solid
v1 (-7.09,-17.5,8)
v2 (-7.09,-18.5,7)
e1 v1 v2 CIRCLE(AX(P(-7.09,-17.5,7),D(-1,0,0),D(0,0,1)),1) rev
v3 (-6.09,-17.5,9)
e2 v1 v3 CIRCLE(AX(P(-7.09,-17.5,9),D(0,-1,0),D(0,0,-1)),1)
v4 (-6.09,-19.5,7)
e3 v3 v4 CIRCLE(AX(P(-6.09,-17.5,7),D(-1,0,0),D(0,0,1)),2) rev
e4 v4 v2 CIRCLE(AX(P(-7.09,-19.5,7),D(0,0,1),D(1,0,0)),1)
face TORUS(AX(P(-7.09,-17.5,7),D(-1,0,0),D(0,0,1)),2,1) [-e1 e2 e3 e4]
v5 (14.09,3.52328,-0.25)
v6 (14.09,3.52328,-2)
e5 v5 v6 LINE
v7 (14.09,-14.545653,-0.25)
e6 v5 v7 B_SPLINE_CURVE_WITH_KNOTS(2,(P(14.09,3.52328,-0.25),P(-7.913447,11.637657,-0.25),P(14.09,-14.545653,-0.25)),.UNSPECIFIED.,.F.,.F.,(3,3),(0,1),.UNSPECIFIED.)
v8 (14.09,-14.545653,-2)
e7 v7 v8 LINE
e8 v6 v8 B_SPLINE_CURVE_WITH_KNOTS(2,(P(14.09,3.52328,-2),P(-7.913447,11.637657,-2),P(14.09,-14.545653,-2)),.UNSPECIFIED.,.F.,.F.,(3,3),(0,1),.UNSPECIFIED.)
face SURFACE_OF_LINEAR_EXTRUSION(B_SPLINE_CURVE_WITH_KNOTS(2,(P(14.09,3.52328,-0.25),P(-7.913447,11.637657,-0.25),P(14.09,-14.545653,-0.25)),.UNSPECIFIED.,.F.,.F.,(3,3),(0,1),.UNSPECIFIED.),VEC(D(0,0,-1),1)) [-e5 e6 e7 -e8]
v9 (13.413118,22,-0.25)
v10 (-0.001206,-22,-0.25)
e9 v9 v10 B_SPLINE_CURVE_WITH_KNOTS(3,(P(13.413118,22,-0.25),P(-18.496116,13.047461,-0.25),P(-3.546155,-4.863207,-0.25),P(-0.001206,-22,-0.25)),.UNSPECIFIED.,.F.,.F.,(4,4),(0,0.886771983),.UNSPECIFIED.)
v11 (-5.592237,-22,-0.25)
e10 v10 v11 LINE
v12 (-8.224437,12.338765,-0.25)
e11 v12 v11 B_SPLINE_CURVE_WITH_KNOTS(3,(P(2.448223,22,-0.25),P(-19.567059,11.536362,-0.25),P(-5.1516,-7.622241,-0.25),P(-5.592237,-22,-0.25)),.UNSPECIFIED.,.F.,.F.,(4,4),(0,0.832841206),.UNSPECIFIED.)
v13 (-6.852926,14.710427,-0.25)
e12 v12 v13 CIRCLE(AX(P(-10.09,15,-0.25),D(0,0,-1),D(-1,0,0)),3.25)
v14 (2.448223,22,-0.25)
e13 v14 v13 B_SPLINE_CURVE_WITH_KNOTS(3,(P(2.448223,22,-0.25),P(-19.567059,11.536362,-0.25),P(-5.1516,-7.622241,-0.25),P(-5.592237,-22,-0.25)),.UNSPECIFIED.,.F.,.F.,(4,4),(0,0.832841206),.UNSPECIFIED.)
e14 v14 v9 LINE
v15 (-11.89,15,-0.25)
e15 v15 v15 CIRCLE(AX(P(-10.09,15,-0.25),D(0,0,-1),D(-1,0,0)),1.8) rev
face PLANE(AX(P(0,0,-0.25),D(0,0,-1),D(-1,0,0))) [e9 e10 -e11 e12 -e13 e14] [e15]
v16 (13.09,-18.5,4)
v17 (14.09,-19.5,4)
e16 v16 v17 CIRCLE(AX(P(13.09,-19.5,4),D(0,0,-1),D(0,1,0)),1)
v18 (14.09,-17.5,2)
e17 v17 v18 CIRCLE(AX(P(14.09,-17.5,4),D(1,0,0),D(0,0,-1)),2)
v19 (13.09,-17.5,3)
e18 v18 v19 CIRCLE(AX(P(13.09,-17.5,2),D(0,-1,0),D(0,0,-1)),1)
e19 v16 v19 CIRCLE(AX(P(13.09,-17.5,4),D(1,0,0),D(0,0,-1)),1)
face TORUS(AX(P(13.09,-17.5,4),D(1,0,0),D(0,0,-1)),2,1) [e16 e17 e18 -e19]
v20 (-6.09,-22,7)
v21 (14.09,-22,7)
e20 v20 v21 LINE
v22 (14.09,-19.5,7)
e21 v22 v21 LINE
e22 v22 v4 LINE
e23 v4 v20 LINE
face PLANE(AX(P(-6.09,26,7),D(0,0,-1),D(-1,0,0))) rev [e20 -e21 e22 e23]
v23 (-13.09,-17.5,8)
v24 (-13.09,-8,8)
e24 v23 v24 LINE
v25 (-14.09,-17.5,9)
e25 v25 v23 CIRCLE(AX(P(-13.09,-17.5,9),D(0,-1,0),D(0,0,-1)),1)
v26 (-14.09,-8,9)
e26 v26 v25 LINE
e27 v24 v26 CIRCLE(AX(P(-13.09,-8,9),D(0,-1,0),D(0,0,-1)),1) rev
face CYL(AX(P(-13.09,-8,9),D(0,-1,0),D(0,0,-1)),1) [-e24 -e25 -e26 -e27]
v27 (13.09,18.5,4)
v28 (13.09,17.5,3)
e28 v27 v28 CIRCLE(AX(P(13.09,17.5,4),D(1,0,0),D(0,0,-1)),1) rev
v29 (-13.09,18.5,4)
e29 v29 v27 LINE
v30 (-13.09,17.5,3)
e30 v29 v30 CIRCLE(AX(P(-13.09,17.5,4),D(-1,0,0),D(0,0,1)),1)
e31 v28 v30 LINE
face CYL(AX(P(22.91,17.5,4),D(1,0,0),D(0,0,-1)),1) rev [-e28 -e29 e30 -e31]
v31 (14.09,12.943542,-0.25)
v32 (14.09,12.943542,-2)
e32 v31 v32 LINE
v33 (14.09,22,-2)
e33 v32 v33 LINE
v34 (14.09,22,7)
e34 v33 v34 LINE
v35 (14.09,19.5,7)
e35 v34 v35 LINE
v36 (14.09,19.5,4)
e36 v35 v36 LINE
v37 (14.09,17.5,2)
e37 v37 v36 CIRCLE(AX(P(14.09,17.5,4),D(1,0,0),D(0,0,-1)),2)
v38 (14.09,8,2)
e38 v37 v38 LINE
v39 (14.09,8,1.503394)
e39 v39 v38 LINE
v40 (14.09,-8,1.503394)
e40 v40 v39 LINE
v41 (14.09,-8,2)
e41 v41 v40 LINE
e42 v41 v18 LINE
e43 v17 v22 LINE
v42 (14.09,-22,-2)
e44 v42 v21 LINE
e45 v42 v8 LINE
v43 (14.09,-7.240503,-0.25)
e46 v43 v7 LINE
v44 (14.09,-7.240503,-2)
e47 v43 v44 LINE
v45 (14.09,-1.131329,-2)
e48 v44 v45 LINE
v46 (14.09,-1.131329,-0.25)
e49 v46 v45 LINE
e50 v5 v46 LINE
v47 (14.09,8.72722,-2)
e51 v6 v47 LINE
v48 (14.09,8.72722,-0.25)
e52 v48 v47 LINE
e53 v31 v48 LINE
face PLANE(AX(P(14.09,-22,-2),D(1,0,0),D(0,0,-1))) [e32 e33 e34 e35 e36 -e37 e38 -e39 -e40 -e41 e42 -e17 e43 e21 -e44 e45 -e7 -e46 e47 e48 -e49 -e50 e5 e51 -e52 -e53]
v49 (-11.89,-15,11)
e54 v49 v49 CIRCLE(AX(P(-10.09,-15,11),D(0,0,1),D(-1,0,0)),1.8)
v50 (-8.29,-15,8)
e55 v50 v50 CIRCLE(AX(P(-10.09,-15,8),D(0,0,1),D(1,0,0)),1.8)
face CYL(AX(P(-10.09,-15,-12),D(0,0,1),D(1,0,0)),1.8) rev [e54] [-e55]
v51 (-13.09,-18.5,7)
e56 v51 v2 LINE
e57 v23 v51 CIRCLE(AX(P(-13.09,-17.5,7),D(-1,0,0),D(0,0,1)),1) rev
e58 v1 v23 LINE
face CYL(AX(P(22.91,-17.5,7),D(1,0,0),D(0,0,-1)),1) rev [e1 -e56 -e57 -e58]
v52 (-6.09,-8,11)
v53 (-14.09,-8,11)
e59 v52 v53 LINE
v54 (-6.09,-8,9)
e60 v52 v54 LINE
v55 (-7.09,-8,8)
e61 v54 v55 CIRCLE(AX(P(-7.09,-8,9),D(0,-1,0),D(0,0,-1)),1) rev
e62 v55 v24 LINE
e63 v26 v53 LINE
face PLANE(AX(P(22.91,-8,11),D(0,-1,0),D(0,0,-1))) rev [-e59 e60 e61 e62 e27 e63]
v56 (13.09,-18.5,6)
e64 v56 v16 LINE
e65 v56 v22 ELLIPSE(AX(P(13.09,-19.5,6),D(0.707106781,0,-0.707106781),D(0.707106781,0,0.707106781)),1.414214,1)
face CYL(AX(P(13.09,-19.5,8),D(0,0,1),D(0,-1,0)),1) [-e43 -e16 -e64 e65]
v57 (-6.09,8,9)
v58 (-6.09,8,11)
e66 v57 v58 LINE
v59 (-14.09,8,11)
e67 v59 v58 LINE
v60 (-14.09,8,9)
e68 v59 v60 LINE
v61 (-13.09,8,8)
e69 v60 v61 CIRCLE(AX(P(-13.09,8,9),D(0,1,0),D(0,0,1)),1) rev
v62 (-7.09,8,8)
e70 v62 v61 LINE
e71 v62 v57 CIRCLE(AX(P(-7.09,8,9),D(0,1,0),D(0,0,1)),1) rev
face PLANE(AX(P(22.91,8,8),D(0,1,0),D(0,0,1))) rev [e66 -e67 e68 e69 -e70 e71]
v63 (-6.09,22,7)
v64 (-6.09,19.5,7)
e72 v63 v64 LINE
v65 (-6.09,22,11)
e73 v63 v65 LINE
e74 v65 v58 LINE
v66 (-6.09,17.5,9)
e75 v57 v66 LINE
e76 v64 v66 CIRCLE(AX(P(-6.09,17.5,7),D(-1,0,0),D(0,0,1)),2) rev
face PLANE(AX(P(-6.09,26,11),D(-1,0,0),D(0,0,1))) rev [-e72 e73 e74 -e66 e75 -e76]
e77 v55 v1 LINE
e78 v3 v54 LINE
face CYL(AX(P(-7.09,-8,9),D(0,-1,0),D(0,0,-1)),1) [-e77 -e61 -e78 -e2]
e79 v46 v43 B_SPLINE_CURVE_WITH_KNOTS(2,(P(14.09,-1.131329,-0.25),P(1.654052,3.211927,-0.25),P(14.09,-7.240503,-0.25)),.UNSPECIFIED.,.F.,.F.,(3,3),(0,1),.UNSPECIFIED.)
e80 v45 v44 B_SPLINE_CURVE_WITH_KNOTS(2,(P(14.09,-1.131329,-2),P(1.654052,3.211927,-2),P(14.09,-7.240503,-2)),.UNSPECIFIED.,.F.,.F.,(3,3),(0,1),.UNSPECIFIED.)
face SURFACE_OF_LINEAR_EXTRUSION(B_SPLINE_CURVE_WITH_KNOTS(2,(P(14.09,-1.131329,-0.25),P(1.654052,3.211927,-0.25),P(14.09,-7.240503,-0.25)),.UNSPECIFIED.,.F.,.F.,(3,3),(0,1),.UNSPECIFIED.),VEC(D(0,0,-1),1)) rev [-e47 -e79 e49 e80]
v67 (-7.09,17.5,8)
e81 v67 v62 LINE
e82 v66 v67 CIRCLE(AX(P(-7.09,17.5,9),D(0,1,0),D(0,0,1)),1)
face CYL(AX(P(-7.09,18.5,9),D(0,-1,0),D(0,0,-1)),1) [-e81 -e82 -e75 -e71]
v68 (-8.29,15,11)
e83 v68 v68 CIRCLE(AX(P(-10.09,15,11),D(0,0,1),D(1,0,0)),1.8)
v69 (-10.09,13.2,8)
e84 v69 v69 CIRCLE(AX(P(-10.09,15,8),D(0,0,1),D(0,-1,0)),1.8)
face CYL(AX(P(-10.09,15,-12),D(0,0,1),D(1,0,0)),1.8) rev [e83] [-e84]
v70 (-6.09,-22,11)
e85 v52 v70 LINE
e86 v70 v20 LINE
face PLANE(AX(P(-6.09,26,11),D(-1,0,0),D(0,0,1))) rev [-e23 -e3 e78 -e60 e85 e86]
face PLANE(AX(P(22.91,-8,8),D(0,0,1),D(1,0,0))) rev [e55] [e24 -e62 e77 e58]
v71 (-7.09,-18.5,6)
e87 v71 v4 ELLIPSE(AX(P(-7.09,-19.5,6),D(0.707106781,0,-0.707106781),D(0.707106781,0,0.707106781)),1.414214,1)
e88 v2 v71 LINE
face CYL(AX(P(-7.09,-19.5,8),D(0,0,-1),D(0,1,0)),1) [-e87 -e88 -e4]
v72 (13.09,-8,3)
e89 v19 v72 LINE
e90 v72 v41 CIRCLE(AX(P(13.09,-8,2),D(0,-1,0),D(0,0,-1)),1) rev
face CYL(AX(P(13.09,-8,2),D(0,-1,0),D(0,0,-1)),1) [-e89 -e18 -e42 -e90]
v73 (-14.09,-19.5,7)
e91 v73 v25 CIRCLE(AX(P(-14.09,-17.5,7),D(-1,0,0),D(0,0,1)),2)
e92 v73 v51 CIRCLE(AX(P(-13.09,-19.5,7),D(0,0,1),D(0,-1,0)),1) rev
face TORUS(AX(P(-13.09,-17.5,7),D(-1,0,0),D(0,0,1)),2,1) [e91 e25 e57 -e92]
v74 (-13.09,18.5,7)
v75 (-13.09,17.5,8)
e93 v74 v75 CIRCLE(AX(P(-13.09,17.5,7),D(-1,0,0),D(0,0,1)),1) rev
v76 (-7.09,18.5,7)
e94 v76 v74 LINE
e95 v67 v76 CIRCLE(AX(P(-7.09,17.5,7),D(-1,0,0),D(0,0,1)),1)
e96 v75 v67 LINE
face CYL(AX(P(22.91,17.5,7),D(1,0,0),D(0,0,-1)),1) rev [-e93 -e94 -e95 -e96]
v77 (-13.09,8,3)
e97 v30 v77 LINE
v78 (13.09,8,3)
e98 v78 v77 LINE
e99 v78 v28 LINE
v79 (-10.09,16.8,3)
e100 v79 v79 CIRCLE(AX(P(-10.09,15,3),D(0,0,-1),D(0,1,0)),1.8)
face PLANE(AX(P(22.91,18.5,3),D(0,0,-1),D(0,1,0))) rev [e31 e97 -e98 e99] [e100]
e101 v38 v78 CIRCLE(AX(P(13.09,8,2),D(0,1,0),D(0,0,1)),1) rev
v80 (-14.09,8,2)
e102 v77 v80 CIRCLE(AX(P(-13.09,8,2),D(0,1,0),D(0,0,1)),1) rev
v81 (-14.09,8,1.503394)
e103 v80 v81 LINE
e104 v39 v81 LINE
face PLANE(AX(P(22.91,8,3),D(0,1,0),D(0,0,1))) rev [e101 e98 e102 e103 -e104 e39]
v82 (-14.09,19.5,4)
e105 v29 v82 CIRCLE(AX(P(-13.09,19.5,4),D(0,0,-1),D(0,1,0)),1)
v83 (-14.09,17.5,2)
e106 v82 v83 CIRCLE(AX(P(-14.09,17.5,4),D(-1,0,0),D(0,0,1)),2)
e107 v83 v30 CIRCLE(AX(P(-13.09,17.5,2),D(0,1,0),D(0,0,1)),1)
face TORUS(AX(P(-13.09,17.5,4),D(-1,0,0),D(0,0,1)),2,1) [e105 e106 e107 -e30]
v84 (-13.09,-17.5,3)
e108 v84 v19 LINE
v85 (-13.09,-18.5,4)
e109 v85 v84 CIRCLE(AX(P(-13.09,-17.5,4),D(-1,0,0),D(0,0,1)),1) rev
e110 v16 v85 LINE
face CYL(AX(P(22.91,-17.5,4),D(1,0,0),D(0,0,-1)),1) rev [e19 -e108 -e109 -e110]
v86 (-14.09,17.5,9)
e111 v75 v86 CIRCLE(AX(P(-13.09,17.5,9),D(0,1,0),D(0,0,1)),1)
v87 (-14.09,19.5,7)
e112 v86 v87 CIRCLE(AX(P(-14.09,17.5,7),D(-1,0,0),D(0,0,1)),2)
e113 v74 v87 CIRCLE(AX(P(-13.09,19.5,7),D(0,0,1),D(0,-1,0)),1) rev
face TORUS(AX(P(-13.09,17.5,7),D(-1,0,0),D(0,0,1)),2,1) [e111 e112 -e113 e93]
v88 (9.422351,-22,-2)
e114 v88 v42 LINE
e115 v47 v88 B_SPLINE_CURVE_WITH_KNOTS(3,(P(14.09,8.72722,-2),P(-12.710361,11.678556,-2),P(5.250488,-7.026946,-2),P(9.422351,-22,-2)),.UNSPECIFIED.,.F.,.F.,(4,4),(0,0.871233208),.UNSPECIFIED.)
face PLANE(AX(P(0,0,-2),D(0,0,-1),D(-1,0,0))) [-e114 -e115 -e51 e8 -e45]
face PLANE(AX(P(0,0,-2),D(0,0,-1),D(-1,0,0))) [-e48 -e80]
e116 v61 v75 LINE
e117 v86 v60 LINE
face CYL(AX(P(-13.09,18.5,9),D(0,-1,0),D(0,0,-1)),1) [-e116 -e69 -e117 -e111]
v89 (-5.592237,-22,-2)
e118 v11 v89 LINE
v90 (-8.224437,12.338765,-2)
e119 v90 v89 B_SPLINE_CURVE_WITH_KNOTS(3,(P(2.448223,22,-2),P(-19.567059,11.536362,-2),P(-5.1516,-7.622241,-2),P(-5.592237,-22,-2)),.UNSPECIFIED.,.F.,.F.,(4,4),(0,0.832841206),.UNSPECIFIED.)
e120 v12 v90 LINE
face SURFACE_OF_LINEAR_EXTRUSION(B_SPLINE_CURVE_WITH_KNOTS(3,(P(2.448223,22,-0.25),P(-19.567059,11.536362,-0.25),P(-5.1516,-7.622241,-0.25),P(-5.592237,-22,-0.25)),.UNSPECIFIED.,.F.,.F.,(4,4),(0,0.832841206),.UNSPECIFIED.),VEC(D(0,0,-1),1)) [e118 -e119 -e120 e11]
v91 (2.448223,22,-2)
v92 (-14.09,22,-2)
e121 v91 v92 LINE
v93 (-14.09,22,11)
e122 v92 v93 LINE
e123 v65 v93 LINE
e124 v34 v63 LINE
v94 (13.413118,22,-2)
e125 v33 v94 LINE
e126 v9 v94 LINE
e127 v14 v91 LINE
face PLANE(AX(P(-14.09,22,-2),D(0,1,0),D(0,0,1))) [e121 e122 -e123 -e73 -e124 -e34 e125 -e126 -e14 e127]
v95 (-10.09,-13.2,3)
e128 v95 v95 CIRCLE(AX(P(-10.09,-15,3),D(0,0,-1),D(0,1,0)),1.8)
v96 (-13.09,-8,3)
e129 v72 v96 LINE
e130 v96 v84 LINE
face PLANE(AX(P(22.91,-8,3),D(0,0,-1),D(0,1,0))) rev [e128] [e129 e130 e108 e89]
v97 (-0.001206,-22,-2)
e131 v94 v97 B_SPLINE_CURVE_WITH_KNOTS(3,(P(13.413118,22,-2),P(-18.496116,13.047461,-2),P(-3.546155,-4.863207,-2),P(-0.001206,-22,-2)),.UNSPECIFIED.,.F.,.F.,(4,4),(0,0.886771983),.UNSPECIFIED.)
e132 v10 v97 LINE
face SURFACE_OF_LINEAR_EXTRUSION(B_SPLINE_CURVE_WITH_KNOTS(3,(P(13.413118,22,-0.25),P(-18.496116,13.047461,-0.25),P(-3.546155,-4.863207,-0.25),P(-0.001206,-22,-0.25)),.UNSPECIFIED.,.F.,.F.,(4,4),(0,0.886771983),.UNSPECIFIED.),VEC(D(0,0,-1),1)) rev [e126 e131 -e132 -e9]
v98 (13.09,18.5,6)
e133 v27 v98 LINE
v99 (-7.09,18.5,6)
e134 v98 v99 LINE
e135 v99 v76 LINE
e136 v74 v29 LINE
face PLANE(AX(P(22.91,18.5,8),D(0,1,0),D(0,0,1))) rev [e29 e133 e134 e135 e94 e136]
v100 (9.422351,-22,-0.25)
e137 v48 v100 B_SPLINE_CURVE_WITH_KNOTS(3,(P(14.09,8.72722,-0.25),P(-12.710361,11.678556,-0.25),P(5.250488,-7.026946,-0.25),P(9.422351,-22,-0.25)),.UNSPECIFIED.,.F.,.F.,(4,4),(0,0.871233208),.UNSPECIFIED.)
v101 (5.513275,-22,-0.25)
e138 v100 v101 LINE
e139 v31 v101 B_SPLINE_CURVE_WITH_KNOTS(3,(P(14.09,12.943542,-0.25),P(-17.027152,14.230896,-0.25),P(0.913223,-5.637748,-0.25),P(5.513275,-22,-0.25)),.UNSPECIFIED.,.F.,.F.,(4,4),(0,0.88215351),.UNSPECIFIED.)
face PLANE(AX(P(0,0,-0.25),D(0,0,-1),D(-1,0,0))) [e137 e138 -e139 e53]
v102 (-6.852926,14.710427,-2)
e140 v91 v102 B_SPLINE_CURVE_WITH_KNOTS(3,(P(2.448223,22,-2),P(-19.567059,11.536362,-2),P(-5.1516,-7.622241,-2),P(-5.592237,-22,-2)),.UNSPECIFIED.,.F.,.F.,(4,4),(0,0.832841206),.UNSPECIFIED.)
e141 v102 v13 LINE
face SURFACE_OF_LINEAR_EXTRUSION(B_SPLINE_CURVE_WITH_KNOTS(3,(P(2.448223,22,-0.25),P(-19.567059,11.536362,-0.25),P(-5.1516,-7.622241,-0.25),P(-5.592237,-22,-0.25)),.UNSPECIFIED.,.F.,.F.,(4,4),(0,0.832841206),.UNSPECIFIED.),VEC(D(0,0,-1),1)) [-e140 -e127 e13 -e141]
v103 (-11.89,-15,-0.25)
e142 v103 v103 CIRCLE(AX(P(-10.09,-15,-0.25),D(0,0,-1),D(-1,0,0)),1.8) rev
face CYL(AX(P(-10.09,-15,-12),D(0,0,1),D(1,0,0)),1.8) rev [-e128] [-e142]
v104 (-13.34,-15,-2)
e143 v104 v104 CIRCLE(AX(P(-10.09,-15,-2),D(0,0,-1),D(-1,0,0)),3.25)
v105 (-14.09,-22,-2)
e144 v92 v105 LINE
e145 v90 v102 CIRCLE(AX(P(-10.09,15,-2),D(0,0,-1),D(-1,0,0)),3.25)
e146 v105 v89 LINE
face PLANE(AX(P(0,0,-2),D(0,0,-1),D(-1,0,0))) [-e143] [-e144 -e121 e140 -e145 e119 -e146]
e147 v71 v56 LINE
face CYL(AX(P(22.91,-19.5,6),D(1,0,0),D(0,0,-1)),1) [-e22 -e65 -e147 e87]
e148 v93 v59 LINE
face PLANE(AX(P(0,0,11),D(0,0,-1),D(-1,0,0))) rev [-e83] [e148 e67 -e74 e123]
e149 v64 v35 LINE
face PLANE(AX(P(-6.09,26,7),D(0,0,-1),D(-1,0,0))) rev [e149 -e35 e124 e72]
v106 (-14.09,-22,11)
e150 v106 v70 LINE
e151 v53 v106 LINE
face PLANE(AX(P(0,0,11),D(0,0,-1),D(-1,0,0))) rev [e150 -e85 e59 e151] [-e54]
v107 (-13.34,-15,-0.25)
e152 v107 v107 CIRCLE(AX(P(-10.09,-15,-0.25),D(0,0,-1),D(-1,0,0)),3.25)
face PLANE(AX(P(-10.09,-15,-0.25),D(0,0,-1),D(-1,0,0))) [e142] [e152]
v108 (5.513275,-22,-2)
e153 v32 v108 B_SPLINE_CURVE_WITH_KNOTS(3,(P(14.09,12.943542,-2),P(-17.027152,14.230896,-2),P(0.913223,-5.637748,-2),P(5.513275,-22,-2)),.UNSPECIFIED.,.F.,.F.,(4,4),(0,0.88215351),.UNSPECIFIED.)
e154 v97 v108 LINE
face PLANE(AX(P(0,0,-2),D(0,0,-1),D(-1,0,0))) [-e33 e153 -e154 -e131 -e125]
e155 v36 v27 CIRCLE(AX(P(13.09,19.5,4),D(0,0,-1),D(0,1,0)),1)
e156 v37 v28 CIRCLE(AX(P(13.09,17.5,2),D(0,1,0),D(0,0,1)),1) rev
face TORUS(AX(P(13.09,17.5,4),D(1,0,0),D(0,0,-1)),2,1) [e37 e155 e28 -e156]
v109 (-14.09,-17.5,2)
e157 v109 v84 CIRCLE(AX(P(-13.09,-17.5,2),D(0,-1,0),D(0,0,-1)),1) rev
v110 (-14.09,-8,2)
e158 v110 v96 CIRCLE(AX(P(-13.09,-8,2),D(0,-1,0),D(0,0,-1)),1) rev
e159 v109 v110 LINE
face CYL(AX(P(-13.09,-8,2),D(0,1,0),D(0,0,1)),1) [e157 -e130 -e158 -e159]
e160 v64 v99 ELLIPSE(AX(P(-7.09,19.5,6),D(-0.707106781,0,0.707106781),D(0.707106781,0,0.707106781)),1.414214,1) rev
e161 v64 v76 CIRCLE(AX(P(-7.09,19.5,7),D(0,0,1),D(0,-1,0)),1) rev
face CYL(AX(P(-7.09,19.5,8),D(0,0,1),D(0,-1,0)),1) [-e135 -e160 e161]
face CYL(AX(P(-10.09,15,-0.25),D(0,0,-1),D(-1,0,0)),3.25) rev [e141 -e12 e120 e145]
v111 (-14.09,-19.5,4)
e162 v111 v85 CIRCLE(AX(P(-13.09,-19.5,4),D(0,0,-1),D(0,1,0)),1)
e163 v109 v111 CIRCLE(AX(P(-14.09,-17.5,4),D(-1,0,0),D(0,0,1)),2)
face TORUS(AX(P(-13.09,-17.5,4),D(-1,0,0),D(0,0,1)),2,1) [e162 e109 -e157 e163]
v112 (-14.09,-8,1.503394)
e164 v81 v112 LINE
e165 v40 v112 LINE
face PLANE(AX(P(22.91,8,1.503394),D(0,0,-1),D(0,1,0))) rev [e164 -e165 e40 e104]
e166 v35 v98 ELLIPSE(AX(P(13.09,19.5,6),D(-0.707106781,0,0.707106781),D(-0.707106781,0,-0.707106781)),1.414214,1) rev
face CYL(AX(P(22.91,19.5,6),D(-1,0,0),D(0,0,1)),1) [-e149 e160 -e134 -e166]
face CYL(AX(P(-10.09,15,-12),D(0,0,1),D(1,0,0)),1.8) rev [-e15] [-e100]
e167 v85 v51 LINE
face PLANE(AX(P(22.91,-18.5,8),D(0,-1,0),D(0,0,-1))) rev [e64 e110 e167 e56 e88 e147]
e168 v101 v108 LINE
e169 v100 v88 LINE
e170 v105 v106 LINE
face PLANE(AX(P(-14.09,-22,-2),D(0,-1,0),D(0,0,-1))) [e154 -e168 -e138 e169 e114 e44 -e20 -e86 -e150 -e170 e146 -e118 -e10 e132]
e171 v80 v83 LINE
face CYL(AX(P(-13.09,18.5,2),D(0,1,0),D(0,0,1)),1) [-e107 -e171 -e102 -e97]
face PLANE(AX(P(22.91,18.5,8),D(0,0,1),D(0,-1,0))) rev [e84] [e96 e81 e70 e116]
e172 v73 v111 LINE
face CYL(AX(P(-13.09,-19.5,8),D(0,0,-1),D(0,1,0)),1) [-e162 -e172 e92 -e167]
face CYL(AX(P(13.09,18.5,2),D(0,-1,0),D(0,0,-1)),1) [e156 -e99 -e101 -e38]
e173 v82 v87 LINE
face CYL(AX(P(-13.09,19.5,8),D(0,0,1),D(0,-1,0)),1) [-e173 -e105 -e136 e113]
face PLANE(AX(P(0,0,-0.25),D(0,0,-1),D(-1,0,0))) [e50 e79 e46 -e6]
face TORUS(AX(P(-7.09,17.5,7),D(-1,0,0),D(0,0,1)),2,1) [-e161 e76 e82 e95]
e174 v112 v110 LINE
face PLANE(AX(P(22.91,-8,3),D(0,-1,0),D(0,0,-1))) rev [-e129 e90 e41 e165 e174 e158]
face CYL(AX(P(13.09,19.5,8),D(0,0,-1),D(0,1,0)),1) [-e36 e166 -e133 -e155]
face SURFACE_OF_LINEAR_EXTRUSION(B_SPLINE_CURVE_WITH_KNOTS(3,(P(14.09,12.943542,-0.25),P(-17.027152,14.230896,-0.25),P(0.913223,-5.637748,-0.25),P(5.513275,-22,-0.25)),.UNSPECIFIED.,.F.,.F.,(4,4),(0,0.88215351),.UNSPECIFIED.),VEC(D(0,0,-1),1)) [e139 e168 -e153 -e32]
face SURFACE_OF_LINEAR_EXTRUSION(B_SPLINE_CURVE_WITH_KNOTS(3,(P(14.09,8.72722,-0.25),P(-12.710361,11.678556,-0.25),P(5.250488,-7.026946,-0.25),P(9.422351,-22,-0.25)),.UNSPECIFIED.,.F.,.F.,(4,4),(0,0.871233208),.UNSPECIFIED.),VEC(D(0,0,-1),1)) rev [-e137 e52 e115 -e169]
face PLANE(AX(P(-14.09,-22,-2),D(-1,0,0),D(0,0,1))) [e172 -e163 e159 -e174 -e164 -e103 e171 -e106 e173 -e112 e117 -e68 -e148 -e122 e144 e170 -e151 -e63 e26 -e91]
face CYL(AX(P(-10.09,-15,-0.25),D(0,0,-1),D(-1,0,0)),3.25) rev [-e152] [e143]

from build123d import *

# Parameters (mm, degrees)
BOSS_EXTRUDE1_DEPTH      = 11
BOSS_EXTRUDE1_DEPTH_BACK = 2
SKETCH1_W                = 28.18
SKETCH1_H                = 44
CUT_EXTRUDE1_DEPTH       = 37
SKETCH4_W                = 20.18
SKETCH4_H                = 4
CUT_EXTRUDE2_DEPTH       = 48
CUT_EXTRUDE3_DEPTH       = 1.75
SKETCH7_R                = 1.8
CUT_EXTRUDE4_DEPTH       = 23
FILLET1_R                = 1
SKETCH8_R                = 3.25
CUT_EXTRUDE5_DEPTH       = 1.75


with BuildPart() as part:
    # Sketch1 → Boss-Extrude1 (new, two sides: drawn at the far end of the back side and taken through both)
    with BuildSketch(Plane.XY.offset(-BOSS_EXTRUDE1_DEPTH_BACK)):
        Rectangle(SKETCH1_W, SKETCH1_H)
    extrude(amount=BOSS_EXTRUDE1_DEPTH + BOSS_EXTRUDE1_DEPTH_BACK)

    # Sketch3 → Cut-Extrude1 (cut)
    with BuildSketch(Plane.ZY.offset(14.09)):
        Polygon((8, 8), (11, 8), (11, -8), (8, -8), (8, -18.5), (3, -18.5), (3, -8), (1.5033938, -8), (1.5033938, 8), (3, 8), (3, 18.5), (8, 18.5), align=None)
    extrude(amount=-CUT_EXTRUDE1_DEPTH, mode=Mode.SUBTRACT)

    # Sketch4 → Cut-Extrude2 (cut)
    with BuildSketch(Plane.XZ.offset(22)):
        with Locations((4, 9)):
            Rectangle(SKETCH4_W, SKETCH4_H)
    extrude(amount=-CUT_EXTRUDE2_DEPTH, mode=Mode.SUBTRACT)

    # Sketch5 → Cut-Extrude3 (cut)
    with BuildSketch(Plane(origin=(0, 0, -2), x_dir=(-1, 0, 0), z_dir=(0, 0, -1))):
        with BuildLine():
            Line((-9.422350513, -22), (-5.513274624, -22))
            add(Edge.make_bspline(
                [(-14.09, 12.943541527), (17.027152303, 14.230895657), (-0.913223026, -5.637747584), (-5.513274624, -22)],
                knots=[0, 0, 0, 0, 0.88215351, 0.88215351, 0.88215351, 0.88215351], degree=3))
            Line((-14.09, 12.943541527), (-14.09, 8.727219843))
            add(Edge.make_bspline(
                [(-14.09, 8.727219843), (12.710361443, 11.678555955), (-5.250487577, -7.026945605), (-9.422350513, -22)],
                knots=[0, 0, 0, 0, 0.871233208, 0.871233208, 0.871233208, 0.871233208], degree=3))
        make_face()
        with BuildLine():
            add(Edge.make_bspline(
                [(-14.09, 3.523280295), (7.913446573, 11.6376574), (-14.09, -14.545652593)],
                knots=[0, 0, 0, 1, 1, 1], degree=2))
            Line((-14.09, 3.523280295), (-14.09, -1.131328535))
            add(Edge.make_bspline(
                [(-14.09, -1.131328535), (-1.654052468, 3.211926994), (-14.09, -7.240502624)],
                knots=[0, 0, 0, 1, 1, 1], degree=2))
            Line((-14.09, -7.240502624), (-14.09, -14.545652593))
        make_face()
        with BuildLine():
            add(Edge.make_bspline(
                [(-2.448223174, 22), (19.56705897, 11.536361781), (5.151599528, -7.62224079), (5.592236917, -22)],
                knots=[0, 0, 0, 0, 0.832841206, 0.832841206, 0.832841206, 0.832841206], degree=3))
            Line((-2.448223174, 22), (-13.413117725, 22))
            add(Edge.make_bspline(
                [(-13.413117725, 22), (18.496116363, 13.047461166), (3.546154763, -4.863207343), (0.001206333, -22)],
                knots=[0, 0, 0, 0, 0.886771983, 0.886771983, 0.886771983, 0.886771983], degree=3))
            Line((0.001206333, -22), (5.592236917, -22))
        make_face()
    extrude(amount=-CUT_EXTRUDE3_DEPTH, mode=Mode.SUBTRACT)

    # Sketch7 → Cut-Extrude4 (cut)
    with BuildSketch(Plane.XY.offset(11)):
        with Locations((-10.09, 15)):
            Circle(SKETCH7_R)
        with Locations((-10.09, -15)):
            Circle(SKETCH7_R)
    extrude(amount=-CUT_EXTRUDE4_DEPTH, mode=Mode.SUBTRACT)

    # Fillet1
    fillet1_edges = [part.edges().sort_by_distance(p)[0] for p in [
        (-14.09, -13.25, 3),
        (-14.09, -13.25, 8),
        (14.09, -13.25, 3),
        (-6.09, -13.25, 8),
        (14.09, 13.25, 3),
        (-14.09, 13.25, 3),
        (-14.09, 13.25, 8),
        (-6.09, 13.25, 8),
        (-14.09, -18.5, 5.5),
        (0, -18.5, 3),
        (14.09, -18.5, 5),
        (4, -18.5, 7),
        (-6.09, -18.5, 7.5),
        (-10.09, -18.5, 8),
        (14.09, 18.5, 5),
        (0, 18.5, 3),
        (-14.09, 18.5, 5.5),
        (-10.09, 18.5, 8),
        (-6.09, 18.5, 7.5),
        (4, 18.5, 7),
    ]]
    fillet(fillet1_edges, radius=FILLET1_R - 0.0001)  # a hair under: the kernel refuses the full size

    # Sketch8 → Cut-Extrude5 (cut)
    with BuildSketch(Plane(origin=(0, 0, -2), x_dir=(-1, 0, 0), z_dir=(0, 0, -1))):
        with Locations((10.09, -15)):
            Circle(SKETCH8_R)
        with Locations((10.09, 15)):
            Circle(SKETCH8_R)
    extrude(amount=-CUT_EXTRUDE5_DEPTH, mode=Mode.SUBTRACT)


solid = part.part
